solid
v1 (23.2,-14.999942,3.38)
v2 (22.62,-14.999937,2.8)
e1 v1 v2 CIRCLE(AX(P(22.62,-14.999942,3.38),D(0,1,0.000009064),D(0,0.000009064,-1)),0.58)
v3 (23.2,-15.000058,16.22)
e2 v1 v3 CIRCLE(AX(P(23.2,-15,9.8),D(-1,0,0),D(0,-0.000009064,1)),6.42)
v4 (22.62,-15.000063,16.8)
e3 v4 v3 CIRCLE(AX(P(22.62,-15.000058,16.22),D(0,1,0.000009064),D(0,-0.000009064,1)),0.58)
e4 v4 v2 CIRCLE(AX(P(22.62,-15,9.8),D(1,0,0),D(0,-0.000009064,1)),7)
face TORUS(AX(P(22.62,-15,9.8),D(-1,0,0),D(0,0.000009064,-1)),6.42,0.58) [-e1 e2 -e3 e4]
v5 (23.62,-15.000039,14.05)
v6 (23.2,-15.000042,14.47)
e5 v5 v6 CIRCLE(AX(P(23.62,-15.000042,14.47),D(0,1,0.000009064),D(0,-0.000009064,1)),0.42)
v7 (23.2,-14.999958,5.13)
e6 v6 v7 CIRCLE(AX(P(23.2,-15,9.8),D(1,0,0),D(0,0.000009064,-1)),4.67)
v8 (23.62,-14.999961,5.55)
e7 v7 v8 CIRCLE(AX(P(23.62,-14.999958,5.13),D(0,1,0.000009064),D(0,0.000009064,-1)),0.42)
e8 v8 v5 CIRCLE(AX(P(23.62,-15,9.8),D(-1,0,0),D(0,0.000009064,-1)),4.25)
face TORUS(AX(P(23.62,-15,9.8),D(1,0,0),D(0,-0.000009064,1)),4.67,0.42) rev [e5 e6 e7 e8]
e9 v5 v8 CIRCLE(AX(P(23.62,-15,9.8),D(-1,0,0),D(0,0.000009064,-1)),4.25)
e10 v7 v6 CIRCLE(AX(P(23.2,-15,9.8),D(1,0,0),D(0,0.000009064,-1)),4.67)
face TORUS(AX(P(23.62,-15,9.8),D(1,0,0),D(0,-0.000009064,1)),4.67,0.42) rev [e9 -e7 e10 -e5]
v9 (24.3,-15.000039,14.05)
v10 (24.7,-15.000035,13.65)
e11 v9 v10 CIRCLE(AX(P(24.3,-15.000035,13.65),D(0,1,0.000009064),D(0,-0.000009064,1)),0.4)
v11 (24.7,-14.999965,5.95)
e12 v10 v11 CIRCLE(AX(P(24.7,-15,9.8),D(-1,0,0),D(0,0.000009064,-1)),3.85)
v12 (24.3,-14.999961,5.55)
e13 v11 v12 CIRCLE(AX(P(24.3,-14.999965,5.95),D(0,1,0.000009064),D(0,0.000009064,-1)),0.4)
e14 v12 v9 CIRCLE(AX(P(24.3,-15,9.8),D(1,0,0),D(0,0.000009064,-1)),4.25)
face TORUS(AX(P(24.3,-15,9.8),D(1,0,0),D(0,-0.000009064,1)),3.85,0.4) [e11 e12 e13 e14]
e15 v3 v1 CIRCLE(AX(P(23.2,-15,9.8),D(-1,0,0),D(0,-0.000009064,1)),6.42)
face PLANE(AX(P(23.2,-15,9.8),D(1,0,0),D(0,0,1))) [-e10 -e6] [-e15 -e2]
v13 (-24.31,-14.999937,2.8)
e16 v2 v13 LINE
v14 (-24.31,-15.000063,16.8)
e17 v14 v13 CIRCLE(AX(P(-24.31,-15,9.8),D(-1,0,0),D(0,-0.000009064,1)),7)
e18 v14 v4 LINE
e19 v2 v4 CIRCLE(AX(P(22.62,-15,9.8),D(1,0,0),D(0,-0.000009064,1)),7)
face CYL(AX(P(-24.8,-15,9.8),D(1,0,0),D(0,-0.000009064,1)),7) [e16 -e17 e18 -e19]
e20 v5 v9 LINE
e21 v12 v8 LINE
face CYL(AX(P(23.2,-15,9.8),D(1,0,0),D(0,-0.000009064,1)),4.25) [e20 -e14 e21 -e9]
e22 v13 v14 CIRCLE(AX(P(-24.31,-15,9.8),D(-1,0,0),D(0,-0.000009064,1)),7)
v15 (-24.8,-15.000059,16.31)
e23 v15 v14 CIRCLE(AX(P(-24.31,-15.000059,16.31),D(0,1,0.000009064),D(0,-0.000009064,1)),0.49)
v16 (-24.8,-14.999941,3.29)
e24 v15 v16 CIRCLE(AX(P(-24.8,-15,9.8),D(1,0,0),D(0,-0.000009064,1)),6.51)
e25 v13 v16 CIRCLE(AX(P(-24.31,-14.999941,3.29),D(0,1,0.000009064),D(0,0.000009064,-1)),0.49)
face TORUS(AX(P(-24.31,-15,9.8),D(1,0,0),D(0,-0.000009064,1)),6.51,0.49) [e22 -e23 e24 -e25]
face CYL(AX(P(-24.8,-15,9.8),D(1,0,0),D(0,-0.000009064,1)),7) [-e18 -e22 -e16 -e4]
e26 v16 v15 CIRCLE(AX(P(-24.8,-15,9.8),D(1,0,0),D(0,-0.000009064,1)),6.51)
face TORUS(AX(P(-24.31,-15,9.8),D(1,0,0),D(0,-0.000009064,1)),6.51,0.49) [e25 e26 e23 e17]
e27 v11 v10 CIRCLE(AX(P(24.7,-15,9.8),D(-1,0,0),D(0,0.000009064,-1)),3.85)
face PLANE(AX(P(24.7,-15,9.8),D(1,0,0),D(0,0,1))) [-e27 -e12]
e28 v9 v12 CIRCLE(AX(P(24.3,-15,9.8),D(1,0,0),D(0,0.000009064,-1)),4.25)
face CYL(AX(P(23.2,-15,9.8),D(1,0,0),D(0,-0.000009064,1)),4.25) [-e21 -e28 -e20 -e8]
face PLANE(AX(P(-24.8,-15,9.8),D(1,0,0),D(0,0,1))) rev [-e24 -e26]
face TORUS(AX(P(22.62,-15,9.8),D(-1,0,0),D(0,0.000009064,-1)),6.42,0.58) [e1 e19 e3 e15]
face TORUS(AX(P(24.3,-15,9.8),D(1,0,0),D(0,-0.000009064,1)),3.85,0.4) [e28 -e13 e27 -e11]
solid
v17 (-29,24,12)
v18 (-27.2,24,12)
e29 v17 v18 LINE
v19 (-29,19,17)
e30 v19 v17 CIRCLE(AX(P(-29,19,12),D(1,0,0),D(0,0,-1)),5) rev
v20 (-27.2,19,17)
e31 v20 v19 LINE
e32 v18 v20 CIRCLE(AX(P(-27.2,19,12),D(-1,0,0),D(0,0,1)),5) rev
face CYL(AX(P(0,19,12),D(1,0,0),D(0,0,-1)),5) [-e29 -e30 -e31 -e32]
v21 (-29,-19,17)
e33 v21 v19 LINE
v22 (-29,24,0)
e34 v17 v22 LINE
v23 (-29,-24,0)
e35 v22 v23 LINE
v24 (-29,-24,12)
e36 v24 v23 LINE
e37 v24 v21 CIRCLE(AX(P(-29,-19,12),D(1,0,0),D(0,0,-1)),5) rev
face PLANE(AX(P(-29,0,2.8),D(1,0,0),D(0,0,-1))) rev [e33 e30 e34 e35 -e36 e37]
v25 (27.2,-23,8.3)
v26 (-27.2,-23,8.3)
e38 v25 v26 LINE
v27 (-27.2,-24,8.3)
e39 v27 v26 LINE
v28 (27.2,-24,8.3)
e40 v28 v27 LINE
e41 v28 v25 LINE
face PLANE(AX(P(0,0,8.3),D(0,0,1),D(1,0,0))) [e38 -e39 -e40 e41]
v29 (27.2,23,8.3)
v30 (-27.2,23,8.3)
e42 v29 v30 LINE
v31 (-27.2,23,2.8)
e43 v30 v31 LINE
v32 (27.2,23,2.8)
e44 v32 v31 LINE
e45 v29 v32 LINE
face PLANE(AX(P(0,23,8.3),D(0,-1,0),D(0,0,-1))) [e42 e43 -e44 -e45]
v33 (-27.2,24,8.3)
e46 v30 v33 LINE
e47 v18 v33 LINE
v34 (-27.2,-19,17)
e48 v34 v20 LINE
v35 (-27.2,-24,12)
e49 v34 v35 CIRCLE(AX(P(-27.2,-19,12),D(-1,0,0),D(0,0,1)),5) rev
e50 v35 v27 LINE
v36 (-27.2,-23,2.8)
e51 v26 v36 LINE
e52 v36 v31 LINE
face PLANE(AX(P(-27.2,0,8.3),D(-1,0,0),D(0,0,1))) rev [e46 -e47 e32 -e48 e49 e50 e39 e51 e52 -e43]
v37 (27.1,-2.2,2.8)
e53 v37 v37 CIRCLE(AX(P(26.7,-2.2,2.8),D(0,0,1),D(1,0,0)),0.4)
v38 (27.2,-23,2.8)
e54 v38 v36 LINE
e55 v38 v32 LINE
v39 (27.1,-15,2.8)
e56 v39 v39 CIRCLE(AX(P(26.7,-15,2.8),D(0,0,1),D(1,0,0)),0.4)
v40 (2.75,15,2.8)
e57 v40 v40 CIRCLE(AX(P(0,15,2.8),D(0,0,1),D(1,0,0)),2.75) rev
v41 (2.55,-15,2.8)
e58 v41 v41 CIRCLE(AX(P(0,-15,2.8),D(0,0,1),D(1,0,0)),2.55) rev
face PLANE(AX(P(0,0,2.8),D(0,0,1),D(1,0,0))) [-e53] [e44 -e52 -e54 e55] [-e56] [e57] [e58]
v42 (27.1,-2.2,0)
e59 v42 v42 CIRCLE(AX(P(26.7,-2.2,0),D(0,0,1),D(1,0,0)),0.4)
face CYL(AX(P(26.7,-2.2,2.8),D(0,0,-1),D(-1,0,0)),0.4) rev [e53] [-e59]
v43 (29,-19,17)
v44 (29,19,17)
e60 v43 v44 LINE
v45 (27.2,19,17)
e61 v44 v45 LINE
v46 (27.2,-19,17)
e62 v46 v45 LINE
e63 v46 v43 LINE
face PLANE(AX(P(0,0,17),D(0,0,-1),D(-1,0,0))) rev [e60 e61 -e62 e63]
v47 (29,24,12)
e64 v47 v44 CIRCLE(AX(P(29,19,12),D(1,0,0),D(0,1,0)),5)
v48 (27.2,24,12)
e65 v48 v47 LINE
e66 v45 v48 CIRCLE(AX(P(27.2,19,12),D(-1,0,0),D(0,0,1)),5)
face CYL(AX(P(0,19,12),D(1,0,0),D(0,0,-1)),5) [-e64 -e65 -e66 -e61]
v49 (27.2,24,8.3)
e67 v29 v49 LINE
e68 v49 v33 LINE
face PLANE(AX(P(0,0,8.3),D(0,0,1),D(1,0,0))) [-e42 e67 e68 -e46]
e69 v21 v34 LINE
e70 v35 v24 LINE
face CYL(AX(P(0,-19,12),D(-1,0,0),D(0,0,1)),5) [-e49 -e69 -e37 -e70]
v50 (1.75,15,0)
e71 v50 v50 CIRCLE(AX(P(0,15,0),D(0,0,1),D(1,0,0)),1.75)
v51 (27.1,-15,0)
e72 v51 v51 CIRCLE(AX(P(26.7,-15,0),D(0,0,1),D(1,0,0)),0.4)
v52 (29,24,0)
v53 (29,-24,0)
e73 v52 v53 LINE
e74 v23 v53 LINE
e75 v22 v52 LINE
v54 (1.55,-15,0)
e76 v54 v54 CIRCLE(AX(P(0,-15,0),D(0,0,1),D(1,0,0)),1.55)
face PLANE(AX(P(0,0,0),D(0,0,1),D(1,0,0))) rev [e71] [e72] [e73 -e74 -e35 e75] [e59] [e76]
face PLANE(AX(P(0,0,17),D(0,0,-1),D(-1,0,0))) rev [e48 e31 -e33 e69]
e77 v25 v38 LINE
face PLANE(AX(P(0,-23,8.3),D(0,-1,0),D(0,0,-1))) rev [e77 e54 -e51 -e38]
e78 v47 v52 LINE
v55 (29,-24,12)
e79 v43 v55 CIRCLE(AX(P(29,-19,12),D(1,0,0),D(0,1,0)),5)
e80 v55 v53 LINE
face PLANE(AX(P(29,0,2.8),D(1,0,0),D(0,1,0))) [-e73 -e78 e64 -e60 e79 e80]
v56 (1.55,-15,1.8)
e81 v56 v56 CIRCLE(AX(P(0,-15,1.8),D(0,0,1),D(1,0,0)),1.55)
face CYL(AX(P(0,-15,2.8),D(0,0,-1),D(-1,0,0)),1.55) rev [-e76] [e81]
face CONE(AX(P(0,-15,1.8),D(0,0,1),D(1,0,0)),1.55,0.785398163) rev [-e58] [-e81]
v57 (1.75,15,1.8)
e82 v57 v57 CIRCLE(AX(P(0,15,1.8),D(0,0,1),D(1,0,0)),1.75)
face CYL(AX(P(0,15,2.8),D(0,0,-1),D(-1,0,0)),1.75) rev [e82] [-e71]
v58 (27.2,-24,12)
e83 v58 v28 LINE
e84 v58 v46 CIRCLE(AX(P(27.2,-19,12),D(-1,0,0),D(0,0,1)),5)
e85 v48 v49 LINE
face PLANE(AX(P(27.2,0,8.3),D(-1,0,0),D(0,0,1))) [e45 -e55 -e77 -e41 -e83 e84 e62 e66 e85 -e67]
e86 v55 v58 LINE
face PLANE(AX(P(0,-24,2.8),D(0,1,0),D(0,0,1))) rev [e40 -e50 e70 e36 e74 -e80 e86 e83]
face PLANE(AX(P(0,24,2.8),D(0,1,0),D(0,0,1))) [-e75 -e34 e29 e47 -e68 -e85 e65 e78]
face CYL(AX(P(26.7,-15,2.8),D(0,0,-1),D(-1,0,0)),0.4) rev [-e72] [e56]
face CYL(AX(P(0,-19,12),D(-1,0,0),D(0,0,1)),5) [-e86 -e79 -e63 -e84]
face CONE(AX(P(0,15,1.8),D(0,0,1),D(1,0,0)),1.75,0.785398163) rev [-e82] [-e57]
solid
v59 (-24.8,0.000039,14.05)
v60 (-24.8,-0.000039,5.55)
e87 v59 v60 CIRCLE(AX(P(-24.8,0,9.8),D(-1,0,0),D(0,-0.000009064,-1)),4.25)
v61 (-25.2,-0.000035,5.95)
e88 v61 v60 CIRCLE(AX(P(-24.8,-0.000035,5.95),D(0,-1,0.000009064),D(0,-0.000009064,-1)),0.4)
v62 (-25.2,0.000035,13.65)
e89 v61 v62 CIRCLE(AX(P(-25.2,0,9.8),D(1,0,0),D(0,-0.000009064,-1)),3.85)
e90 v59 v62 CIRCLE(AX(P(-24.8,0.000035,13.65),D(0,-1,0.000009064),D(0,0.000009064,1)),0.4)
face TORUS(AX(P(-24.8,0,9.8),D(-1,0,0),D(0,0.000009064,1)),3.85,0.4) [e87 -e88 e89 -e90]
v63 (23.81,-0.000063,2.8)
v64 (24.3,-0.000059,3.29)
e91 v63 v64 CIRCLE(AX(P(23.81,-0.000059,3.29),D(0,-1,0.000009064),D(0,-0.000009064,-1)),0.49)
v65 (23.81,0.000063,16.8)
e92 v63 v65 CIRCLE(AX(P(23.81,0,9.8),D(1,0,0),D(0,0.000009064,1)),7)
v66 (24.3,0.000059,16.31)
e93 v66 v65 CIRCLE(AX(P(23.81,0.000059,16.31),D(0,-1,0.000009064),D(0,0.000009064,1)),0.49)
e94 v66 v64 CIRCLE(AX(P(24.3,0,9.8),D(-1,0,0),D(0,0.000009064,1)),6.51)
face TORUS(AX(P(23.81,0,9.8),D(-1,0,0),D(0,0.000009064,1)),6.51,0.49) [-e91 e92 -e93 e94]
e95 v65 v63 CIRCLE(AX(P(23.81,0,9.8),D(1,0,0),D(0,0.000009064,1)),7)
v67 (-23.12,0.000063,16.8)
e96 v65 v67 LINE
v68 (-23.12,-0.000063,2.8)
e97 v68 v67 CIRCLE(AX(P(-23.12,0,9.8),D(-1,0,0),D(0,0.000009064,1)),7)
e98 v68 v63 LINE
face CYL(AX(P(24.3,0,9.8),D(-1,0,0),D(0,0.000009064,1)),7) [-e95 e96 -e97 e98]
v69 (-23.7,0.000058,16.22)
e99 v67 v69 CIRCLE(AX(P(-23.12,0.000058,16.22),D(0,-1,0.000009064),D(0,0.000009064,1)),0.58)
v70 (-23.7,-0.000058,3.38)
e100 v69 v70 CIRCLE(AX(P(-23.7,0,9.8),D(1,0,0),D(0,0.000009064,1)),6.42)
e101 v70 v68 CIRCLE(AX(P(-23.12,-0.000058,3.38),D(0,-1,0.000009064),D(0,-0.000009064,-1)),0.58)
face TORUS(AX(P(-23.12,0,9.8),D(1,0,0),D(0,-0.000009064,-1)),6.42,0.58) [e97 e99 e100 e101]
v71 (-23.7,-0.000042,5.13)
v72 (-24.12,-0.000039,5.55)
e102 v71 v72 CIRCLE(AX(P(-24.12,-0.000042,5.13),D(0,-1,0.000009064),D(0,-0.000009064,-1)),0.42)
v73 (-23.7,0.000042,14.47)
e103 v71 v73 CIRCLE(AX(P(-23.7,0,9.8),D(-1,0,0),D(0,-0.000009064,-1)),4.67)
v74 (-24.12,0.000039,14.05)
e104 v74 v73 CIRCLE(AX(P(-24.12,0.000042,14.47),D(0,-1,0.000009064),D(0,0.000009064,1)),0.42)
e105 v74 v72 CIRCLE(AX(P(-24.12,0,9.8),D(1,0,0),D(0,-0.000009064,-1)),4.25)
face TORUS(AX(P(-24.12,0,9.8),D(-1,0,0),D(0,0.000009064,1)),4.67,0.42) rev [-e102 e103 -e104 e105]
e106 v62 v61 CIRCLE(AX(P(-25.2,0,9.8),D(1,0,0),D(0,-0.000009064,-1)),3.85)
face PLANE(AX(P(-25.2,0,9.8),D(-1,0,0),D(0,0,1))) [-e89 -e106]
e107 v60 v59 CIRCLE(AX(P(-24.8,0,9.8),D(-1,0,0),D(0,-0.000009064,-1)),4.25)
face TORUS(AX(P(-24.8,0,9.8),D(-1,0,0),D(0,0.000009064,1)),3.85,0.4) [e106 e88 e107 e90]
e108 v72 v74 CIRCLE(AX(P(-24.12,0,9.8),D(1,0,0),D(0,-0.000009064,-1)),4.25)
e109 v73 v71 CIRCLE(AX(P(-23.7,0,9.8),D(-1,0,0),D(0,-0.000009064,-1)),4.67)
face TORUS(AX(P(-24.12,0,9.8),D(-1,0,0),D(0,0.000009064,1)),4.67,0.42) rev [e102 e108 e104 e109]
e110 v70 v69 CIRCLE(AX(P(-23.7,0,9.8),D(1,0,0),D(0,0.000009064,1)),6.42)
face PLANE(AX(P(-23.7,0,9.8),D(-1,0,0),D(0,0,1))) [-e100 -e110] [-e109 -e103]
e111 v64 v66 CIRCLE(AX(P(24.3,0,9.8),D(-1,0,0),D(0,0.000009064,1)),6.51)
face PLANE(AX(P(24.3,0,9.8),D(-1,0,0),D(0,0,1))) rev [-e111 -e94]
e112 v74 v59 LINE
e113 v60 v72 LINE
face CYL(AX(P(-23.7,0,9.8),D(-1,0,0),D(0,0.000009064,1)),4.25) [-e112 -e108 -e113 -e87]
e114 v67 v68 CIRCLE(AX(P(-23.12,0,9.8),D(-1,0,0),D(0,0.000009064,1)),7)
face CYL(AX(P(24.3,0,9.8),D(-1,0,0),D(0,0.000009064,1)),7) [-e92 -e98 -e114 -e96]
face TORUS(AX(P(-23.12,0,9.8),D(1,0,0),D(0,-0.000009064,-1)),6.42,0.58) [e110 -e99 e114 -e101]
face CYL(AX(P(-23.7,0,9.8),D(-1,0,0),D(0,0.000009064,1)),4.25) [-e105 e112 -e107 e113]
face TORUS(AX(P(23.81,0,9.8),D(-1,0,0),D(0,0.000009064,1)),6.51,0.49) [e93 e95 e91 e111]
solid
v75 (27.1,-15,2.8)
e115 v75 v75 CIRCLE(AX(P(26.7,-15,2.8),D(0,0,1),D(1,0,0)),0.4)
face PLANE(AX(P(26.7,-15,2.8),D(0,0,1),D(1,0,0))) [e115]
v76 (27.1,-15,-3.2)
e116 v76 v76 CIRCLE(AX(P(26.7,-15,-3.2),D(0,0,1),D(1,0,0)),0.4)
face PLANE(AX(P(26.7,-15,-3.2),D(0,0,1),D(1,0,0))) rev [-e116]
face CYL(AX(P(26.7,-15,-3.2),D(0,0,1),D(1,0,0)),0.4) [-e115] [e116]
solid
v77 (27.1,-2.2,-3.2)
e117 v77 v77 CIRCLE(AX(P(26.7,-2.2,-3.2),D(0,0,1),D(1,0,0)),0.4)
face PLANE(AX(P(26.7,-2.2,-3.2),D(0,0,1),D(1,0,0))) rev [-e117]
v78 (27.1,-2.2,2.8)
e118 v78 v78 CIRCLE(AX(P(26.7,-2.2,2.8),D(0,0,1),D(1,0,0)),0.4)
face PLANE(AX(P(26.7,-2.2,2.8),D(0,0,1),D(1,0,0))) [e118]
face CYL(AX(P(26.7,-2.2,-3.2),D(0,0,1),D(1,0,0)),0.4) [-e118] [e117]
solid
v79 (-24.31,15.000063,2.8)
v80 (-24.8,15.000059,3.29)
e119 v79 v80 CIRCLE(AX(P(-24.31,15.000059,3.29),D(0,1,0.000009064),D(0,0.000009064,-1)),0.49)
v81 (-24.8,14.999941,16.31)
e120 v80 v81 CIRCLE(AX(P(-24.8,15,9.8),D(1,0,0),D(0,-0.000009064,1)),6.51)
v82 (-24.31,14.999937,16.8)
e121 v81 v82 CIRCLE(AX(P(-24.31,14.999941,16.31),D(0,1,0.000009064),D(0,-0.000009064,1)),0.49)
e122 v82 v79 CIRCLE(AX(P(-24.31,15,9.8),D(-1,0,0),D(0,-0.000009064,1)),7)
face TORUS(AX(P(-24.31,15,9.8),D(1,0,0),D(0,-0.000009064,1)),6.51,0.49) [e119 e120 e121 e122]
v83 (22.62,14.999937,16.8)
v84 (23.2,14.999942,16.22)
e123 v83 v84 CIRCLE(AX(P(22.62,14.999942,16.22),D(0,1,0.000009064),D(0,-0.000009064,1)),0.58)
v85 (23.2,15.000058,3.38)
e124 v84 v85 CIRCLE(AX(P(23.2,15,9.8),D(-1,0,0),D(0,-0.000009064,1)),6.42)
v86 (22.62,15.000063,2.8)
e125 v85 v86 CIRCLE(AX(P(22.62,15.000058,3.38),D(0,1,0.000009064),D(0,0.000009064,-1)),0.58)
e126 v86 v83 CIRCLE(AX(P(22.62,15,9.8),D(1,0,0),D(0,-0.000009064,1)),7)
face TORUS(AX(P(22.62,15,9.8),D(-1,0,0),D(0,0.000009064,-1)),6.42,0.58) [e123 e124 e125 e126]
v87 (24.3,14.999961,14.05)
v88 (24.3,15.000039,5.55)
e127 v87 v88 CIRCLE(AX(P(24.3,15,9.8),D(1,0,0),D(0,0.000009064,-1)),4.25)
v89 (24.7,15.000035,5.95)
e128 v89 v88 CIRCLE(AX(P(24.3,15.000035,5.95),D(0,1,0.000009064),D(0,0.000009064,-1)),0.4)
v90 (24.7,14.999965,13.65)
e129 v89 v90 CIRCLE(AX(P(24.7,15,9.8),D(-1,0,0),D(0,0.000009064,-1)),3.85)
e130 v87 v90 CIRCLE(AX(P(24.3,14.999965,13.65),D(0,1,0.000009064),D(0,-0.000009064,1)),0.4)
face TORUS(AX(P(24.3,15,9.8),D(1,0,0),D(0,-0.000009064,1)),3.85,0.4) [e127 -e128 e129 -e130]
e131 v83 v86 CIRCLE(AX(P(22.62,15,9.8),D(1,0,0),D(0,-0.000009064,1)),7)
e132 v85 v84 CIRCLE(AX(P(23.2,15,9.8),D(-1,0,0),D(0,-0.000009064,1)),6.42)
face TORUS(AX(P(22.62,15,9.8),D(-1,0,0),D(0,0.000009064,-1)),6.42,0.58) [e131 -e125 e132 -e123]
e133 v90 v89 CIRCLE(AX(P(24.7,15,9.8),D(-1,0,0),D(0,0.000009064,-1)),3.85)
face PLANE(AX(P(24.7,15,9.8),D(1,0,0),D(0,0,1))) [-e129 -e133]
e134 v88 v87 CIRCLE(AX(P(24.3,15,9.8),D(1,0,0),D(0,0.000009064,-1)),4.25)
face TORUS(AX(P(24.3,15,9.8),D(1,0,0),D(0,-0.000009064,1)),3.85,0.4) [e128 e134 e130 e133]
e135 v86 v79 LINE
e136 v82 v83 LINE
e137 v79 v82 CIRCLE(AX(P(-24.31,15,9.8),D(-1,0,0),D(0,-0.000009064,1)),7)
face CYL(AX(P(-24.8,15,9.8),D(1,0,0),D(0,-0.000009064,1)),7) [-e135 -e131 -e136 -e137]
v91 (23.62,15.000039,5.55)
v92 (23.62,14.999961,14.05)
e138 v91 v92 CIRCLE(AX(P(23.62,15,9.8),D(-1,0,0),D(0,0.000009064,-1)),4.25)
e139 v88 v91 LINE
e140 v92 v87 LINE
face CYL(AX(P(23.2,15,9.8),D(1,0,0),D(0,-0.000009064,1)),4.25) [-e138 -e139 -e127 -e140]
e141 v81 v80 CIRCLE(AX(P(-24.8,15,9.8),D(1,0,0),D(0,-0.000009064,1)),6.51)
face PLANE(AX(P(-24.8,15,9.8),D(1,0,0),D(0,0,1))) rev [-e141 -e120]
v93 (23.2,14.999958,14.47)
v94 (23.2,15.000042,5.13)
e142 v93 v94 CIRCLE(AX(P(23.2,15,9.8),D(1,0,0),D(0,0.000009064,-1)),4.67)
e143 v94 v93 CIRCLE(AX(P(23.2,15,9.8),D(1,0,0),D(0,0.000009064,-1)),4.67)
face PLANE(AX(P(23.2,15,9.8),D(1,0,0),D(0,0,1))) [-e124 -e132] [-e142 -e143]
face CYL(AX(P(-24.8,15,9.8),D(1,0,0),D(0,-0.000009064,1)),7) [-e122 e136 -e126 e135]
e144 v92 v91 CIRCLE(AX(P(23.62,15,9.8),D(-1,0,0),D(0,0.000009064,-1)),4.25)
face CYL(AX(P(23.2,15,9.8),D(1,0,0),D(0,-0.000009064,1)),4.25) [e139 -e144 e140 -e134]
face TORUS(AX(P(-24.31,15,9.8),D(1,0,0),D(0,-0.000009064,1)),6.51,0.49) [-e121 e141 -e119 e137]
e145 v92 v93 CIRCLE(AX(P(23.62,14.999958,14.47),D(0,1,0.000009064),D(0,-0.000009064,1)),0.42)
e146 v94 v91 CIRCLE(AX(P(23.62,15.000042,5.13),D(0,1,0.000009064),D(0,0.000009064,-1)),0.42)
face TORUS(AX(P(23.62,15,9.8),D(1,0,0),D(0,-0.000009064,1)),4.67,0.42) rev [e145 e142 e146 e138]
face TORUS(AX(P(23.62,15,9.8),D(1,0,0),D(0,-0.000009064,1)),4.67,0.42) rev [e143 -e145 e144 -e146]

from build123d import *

# Parameters (mm, degrees)
SKETCH1_W                = 54.4
SKETCH1_H                = 1
SKETCH1_H_2              = 14.733333333
SKETCH1_R                = 1.75
SKETCH1_R_2              = 1.55
SKETCH1_R_3              = 0.4
SKETCH1_H_3              = 14.533333334
FLOOR_2_DEPTH            = 2.8
SIDES_START              = 2.8
SKETCH1_3_W              = 54.4
SKETCH1_3_H              = 1
SIDES_DEPTH              = 5.5
ENDS_START               = 8.3
ENDS_DEPTH               = 8.7
ROUND_ENDS_R             = 5
CHAMFER_SCREW_HOLES_SIZE = 1
PINS_START               = 2.8
SKETCH1_6_R              = 0.4
PINS_DEPTH               = 6
PINS_2_DEPTH             = 6
ROTATE_TOP_CELL_ANGLE    = 180


# Read off the part's stored shape, not the designer's step: place_mid_cell, place_top_cell
with BuildPart() as part:
    # Sketch1 → floor 2 (new body)
    # profile 1 of 9: a face of its own
    with BuildSketch(Plane.XY):
        Polygon((-27.2, 24), (-29, 24), (-29, -24), (-27.2, -24), (-27.2, -23), (-27.2, -8.266666667), (-27.2, -7.266666667), (-27.2, 7.266666667), (-27.2, 8.266666667), (-27.2, 23), align=None)
    # profile 2 of 9: a face of its own
    with BuildSketch(Plane.XY):
        with Locations((0, 23.5)):
            Rectangle(SKETCH1_W, SKETCH1_H)
    # profile 3 of 9: a face of its own
    with BuildSketch(Plane.XY):
        with Locations((0, -23.5)):
            Rectangle(SKETCH1_W, SKETCH1_H)
    # profile 4 of 9: a face of its own
    with BuildSketch(Plane.XY):
        with Locations((0, 15.633333334)):
            Rectangle(SKETCH1_W, SKETCH1_H_2)
        with Locations((0, 15)):
            Circle(SKETCH1_R, mode=Mode.SUBTRACT)
    # profile 5 of 9: a face of its own
    with BuildSketch(Plane.XY):
        Polygon((29, 24), (27.2, 24), (27.2, 23), (27.2, 8.266666667), (27.2, 7.266666667), (27.2, -7.266666667), (27.2, -8.266666667), (27.2, -23), (27.2, -24), (29, -24), align=None)
    # profile 6 of 9: a face of its own
    with BuildSketch(Plane.XY):
        with Locations((0, -15.633333334)):
            Rectangle(SKETCH1_W, SKETCH1_H_2)
        with Locations((0, -15)):
            Circle(SKETCH1_R_2, mode=Mode.SUBTRACT)
        with Locations((26.7, -15)):
            Circle(SKETCH1_R_3, mode=Mode.SUBTRACT)
    # profile 7 of 9: a face of its own
    with BuildSketch(Plane.XY):
        with Locations((0, 7.766666667)):
            Rectangle(SKETCH1_W, SKETCH1_H)
    # profile 8 of 9: a face of its own
    with BuildSketch(Plane.XY):
        with Locations((0, -7.766666667)):
            Rectangle(SKETCH1_W, SKETCH1_H)
    # profile 9 of 9: a face of its own
    with BuildSketch(Plane.XY):
        Rectangle(SKETCH1_W, SKETCH1_H_3)
        with Locations((26.7, -2.2)):
            Circle(SKETCH1_R_3, mode=Mode.SUBTRACT)
    extrude(amount=FLOOR_2_DEPTH)

    # Sketch1<3> → sides (add)
    with BuildSketch(Plane.XY.offset(SIDES_START)):
        with Locations((0, 23.5)):
            Rectangle(SKETCH1_3_W, SKETCH1_3_H)
        Polygon((27.2, -23), (27.2, -24), (29, -24), (29, 24), (27.2, 24), (27.2, 23), align=None)
        with Locations((0, -23.5)):
            Rectangle(SKETCH1_3_W, SKETCH1_3_H)
        Polygon((-29, 24), (-29, -24), (-27.2, -24), (-27.2, -23), (-27.2, 23), (-27.2, 24), align=None)
    extrude(amount=SIDES_DEPTH)

    # Sketch1<5> → ends (add)
    with BuildSketch(Plane.XY.offset(ENDS_START)):
        Polygon((27.2, -23), (27.2, -24), (29, -24), (29, 24), (27.2, 24), (27.2, 23), align=None)
        Polygon((-29, 24), (-29, -24), (-27.2, -24), (-27.2, -23), (-27.2, 23), (-27.2, 24), align=None)
    extrude(amount=ENDS_DEPTH)

    # round_ends
    round_ends_edges = [part.edges().sort_by_distance(p)[0] for p in [
        (28.1, -24, 17),
        (28.1, 24, 17),
        (-28.1, -24, 17),
        (-28.1, 24, 17),
    ]]
    fillet(round_ends_edges, radius=ROUND_ENDS_R)

    # chamfer_screw_holes
    chamfer_screw_holes_edges = [part.edges().sort_by_distance(p)[0] for p in [
        (-1.75, 15, 2.8),
        (-1.55, -15, 2.8),
    ]]
    chamfer(chamfer_screw_holes_edges, length=CHAMFER_SCREW_HOLES_SIZE)

    # place_mid_cell outline → place_mid_cell (revolve)
    with BuildSketch(Plane.YX.offset(-9.8)):
        with BuildLine():
            ThreePointArc((3.85, -25.2), (4.132842712, -25.082842712), (4.25, -24.8))
            Line((4.25, -24.8), (4.25, -24.12))
            ThreePointArc((4.25, -24.12), (4.373015152, -23.823015152), (4.67, -23.7))
            Line((4.67, -23.7), (6.42, -23.7))
            ThreePointArc((6.42, -23.7), (6.830121933, -23.530121933), (7, -23.12))
            Line((7, -23.12), (7, 23.81))
            ThreePointArc((7, 23.81), (6.856482323, 24.156482323), (6.51, 24.3))
            Line((6.51, 24.3), (0, 24.3))
            Line((0, 24.3), (0, -25.2))
            Line((0, -25.2), (3.85, -25.2))
        make_face()
    revolve(axis=Axis((0, 0, 9.8), (1, 0, 0)))


with BuildPart() as body_2:
    # Sketch1<6> → pins (new body)
    with BuildSketch(Plane.XY.offset(PINS_START)):
        with Locations((26.7, -15)):
            Circle(SKETCH1_6_R)
    extrude(amount=-PINS_DEPTH)


with BuildPart() as body_3:
    # Sketch1<6> → pins 2 (new body)
    with BuildSketch(Plane.XY.offset(PINS_START)):
        with Locations((26.7, -2.2)):
            Circle(SKETCH1_6_R)
    extrude(amount=-PINS_2_DEPTH)


with BuildPart() as body_4:
    # place_top_cell outline → place_top_cell (revolve)
    with BuildSketch(Plane(origin=(0, 15, 9.8), x_dir=(0, 1, 0), z_dir=(0, 0, -1))):
        with BuildLine():
            Line((6.51, 24.3), (0, 24.3))
            Line((0, 24.3), (0, -25.2))
            Line((0, -25.2), (3.85, -25.2))
            ThreePointArc((3.85, -25.2), (4.132842712, -25.082842712), (4.25, -24.8))
            Line((4.25, -24.8), (4.25, -24.12))
            ThreePointArc((4.25, -24.12), (4.373015152, -23.823015152), (4.67, -23.7))
            Line((4.67, -23.7), (6.42, -23.7))
            ThreePointArc((6.42, -23.7), (6.830121933, -23.530121933), (7, -23.12))
            Line((7, -23.12), (7, 23.81))
            ThreePointArc((7, 23.81), (6.856482323, 24.156482323), (6.51, 24.3))
        make_face()
    revolve(axis=Axis((0, 15, 9.8), (1, 0, 0)))


with BuildPart() as body_4_1:
    # rotate_top_cell: moved
    add(body_4.part.rotate(Axis((-0.25, 15, 0), (0, 0, 1)), ROTATE_TOP_CELL_ANGLE))


with BuildPart() as body_5:
    # place_bottom_cell: copy of body 4
    add(body_4_1.part.moved(Location((0, -30, 0))))


solid = Compound([part.part, body_2.part, body_3.part, body_4_1.part, body_5.part])
